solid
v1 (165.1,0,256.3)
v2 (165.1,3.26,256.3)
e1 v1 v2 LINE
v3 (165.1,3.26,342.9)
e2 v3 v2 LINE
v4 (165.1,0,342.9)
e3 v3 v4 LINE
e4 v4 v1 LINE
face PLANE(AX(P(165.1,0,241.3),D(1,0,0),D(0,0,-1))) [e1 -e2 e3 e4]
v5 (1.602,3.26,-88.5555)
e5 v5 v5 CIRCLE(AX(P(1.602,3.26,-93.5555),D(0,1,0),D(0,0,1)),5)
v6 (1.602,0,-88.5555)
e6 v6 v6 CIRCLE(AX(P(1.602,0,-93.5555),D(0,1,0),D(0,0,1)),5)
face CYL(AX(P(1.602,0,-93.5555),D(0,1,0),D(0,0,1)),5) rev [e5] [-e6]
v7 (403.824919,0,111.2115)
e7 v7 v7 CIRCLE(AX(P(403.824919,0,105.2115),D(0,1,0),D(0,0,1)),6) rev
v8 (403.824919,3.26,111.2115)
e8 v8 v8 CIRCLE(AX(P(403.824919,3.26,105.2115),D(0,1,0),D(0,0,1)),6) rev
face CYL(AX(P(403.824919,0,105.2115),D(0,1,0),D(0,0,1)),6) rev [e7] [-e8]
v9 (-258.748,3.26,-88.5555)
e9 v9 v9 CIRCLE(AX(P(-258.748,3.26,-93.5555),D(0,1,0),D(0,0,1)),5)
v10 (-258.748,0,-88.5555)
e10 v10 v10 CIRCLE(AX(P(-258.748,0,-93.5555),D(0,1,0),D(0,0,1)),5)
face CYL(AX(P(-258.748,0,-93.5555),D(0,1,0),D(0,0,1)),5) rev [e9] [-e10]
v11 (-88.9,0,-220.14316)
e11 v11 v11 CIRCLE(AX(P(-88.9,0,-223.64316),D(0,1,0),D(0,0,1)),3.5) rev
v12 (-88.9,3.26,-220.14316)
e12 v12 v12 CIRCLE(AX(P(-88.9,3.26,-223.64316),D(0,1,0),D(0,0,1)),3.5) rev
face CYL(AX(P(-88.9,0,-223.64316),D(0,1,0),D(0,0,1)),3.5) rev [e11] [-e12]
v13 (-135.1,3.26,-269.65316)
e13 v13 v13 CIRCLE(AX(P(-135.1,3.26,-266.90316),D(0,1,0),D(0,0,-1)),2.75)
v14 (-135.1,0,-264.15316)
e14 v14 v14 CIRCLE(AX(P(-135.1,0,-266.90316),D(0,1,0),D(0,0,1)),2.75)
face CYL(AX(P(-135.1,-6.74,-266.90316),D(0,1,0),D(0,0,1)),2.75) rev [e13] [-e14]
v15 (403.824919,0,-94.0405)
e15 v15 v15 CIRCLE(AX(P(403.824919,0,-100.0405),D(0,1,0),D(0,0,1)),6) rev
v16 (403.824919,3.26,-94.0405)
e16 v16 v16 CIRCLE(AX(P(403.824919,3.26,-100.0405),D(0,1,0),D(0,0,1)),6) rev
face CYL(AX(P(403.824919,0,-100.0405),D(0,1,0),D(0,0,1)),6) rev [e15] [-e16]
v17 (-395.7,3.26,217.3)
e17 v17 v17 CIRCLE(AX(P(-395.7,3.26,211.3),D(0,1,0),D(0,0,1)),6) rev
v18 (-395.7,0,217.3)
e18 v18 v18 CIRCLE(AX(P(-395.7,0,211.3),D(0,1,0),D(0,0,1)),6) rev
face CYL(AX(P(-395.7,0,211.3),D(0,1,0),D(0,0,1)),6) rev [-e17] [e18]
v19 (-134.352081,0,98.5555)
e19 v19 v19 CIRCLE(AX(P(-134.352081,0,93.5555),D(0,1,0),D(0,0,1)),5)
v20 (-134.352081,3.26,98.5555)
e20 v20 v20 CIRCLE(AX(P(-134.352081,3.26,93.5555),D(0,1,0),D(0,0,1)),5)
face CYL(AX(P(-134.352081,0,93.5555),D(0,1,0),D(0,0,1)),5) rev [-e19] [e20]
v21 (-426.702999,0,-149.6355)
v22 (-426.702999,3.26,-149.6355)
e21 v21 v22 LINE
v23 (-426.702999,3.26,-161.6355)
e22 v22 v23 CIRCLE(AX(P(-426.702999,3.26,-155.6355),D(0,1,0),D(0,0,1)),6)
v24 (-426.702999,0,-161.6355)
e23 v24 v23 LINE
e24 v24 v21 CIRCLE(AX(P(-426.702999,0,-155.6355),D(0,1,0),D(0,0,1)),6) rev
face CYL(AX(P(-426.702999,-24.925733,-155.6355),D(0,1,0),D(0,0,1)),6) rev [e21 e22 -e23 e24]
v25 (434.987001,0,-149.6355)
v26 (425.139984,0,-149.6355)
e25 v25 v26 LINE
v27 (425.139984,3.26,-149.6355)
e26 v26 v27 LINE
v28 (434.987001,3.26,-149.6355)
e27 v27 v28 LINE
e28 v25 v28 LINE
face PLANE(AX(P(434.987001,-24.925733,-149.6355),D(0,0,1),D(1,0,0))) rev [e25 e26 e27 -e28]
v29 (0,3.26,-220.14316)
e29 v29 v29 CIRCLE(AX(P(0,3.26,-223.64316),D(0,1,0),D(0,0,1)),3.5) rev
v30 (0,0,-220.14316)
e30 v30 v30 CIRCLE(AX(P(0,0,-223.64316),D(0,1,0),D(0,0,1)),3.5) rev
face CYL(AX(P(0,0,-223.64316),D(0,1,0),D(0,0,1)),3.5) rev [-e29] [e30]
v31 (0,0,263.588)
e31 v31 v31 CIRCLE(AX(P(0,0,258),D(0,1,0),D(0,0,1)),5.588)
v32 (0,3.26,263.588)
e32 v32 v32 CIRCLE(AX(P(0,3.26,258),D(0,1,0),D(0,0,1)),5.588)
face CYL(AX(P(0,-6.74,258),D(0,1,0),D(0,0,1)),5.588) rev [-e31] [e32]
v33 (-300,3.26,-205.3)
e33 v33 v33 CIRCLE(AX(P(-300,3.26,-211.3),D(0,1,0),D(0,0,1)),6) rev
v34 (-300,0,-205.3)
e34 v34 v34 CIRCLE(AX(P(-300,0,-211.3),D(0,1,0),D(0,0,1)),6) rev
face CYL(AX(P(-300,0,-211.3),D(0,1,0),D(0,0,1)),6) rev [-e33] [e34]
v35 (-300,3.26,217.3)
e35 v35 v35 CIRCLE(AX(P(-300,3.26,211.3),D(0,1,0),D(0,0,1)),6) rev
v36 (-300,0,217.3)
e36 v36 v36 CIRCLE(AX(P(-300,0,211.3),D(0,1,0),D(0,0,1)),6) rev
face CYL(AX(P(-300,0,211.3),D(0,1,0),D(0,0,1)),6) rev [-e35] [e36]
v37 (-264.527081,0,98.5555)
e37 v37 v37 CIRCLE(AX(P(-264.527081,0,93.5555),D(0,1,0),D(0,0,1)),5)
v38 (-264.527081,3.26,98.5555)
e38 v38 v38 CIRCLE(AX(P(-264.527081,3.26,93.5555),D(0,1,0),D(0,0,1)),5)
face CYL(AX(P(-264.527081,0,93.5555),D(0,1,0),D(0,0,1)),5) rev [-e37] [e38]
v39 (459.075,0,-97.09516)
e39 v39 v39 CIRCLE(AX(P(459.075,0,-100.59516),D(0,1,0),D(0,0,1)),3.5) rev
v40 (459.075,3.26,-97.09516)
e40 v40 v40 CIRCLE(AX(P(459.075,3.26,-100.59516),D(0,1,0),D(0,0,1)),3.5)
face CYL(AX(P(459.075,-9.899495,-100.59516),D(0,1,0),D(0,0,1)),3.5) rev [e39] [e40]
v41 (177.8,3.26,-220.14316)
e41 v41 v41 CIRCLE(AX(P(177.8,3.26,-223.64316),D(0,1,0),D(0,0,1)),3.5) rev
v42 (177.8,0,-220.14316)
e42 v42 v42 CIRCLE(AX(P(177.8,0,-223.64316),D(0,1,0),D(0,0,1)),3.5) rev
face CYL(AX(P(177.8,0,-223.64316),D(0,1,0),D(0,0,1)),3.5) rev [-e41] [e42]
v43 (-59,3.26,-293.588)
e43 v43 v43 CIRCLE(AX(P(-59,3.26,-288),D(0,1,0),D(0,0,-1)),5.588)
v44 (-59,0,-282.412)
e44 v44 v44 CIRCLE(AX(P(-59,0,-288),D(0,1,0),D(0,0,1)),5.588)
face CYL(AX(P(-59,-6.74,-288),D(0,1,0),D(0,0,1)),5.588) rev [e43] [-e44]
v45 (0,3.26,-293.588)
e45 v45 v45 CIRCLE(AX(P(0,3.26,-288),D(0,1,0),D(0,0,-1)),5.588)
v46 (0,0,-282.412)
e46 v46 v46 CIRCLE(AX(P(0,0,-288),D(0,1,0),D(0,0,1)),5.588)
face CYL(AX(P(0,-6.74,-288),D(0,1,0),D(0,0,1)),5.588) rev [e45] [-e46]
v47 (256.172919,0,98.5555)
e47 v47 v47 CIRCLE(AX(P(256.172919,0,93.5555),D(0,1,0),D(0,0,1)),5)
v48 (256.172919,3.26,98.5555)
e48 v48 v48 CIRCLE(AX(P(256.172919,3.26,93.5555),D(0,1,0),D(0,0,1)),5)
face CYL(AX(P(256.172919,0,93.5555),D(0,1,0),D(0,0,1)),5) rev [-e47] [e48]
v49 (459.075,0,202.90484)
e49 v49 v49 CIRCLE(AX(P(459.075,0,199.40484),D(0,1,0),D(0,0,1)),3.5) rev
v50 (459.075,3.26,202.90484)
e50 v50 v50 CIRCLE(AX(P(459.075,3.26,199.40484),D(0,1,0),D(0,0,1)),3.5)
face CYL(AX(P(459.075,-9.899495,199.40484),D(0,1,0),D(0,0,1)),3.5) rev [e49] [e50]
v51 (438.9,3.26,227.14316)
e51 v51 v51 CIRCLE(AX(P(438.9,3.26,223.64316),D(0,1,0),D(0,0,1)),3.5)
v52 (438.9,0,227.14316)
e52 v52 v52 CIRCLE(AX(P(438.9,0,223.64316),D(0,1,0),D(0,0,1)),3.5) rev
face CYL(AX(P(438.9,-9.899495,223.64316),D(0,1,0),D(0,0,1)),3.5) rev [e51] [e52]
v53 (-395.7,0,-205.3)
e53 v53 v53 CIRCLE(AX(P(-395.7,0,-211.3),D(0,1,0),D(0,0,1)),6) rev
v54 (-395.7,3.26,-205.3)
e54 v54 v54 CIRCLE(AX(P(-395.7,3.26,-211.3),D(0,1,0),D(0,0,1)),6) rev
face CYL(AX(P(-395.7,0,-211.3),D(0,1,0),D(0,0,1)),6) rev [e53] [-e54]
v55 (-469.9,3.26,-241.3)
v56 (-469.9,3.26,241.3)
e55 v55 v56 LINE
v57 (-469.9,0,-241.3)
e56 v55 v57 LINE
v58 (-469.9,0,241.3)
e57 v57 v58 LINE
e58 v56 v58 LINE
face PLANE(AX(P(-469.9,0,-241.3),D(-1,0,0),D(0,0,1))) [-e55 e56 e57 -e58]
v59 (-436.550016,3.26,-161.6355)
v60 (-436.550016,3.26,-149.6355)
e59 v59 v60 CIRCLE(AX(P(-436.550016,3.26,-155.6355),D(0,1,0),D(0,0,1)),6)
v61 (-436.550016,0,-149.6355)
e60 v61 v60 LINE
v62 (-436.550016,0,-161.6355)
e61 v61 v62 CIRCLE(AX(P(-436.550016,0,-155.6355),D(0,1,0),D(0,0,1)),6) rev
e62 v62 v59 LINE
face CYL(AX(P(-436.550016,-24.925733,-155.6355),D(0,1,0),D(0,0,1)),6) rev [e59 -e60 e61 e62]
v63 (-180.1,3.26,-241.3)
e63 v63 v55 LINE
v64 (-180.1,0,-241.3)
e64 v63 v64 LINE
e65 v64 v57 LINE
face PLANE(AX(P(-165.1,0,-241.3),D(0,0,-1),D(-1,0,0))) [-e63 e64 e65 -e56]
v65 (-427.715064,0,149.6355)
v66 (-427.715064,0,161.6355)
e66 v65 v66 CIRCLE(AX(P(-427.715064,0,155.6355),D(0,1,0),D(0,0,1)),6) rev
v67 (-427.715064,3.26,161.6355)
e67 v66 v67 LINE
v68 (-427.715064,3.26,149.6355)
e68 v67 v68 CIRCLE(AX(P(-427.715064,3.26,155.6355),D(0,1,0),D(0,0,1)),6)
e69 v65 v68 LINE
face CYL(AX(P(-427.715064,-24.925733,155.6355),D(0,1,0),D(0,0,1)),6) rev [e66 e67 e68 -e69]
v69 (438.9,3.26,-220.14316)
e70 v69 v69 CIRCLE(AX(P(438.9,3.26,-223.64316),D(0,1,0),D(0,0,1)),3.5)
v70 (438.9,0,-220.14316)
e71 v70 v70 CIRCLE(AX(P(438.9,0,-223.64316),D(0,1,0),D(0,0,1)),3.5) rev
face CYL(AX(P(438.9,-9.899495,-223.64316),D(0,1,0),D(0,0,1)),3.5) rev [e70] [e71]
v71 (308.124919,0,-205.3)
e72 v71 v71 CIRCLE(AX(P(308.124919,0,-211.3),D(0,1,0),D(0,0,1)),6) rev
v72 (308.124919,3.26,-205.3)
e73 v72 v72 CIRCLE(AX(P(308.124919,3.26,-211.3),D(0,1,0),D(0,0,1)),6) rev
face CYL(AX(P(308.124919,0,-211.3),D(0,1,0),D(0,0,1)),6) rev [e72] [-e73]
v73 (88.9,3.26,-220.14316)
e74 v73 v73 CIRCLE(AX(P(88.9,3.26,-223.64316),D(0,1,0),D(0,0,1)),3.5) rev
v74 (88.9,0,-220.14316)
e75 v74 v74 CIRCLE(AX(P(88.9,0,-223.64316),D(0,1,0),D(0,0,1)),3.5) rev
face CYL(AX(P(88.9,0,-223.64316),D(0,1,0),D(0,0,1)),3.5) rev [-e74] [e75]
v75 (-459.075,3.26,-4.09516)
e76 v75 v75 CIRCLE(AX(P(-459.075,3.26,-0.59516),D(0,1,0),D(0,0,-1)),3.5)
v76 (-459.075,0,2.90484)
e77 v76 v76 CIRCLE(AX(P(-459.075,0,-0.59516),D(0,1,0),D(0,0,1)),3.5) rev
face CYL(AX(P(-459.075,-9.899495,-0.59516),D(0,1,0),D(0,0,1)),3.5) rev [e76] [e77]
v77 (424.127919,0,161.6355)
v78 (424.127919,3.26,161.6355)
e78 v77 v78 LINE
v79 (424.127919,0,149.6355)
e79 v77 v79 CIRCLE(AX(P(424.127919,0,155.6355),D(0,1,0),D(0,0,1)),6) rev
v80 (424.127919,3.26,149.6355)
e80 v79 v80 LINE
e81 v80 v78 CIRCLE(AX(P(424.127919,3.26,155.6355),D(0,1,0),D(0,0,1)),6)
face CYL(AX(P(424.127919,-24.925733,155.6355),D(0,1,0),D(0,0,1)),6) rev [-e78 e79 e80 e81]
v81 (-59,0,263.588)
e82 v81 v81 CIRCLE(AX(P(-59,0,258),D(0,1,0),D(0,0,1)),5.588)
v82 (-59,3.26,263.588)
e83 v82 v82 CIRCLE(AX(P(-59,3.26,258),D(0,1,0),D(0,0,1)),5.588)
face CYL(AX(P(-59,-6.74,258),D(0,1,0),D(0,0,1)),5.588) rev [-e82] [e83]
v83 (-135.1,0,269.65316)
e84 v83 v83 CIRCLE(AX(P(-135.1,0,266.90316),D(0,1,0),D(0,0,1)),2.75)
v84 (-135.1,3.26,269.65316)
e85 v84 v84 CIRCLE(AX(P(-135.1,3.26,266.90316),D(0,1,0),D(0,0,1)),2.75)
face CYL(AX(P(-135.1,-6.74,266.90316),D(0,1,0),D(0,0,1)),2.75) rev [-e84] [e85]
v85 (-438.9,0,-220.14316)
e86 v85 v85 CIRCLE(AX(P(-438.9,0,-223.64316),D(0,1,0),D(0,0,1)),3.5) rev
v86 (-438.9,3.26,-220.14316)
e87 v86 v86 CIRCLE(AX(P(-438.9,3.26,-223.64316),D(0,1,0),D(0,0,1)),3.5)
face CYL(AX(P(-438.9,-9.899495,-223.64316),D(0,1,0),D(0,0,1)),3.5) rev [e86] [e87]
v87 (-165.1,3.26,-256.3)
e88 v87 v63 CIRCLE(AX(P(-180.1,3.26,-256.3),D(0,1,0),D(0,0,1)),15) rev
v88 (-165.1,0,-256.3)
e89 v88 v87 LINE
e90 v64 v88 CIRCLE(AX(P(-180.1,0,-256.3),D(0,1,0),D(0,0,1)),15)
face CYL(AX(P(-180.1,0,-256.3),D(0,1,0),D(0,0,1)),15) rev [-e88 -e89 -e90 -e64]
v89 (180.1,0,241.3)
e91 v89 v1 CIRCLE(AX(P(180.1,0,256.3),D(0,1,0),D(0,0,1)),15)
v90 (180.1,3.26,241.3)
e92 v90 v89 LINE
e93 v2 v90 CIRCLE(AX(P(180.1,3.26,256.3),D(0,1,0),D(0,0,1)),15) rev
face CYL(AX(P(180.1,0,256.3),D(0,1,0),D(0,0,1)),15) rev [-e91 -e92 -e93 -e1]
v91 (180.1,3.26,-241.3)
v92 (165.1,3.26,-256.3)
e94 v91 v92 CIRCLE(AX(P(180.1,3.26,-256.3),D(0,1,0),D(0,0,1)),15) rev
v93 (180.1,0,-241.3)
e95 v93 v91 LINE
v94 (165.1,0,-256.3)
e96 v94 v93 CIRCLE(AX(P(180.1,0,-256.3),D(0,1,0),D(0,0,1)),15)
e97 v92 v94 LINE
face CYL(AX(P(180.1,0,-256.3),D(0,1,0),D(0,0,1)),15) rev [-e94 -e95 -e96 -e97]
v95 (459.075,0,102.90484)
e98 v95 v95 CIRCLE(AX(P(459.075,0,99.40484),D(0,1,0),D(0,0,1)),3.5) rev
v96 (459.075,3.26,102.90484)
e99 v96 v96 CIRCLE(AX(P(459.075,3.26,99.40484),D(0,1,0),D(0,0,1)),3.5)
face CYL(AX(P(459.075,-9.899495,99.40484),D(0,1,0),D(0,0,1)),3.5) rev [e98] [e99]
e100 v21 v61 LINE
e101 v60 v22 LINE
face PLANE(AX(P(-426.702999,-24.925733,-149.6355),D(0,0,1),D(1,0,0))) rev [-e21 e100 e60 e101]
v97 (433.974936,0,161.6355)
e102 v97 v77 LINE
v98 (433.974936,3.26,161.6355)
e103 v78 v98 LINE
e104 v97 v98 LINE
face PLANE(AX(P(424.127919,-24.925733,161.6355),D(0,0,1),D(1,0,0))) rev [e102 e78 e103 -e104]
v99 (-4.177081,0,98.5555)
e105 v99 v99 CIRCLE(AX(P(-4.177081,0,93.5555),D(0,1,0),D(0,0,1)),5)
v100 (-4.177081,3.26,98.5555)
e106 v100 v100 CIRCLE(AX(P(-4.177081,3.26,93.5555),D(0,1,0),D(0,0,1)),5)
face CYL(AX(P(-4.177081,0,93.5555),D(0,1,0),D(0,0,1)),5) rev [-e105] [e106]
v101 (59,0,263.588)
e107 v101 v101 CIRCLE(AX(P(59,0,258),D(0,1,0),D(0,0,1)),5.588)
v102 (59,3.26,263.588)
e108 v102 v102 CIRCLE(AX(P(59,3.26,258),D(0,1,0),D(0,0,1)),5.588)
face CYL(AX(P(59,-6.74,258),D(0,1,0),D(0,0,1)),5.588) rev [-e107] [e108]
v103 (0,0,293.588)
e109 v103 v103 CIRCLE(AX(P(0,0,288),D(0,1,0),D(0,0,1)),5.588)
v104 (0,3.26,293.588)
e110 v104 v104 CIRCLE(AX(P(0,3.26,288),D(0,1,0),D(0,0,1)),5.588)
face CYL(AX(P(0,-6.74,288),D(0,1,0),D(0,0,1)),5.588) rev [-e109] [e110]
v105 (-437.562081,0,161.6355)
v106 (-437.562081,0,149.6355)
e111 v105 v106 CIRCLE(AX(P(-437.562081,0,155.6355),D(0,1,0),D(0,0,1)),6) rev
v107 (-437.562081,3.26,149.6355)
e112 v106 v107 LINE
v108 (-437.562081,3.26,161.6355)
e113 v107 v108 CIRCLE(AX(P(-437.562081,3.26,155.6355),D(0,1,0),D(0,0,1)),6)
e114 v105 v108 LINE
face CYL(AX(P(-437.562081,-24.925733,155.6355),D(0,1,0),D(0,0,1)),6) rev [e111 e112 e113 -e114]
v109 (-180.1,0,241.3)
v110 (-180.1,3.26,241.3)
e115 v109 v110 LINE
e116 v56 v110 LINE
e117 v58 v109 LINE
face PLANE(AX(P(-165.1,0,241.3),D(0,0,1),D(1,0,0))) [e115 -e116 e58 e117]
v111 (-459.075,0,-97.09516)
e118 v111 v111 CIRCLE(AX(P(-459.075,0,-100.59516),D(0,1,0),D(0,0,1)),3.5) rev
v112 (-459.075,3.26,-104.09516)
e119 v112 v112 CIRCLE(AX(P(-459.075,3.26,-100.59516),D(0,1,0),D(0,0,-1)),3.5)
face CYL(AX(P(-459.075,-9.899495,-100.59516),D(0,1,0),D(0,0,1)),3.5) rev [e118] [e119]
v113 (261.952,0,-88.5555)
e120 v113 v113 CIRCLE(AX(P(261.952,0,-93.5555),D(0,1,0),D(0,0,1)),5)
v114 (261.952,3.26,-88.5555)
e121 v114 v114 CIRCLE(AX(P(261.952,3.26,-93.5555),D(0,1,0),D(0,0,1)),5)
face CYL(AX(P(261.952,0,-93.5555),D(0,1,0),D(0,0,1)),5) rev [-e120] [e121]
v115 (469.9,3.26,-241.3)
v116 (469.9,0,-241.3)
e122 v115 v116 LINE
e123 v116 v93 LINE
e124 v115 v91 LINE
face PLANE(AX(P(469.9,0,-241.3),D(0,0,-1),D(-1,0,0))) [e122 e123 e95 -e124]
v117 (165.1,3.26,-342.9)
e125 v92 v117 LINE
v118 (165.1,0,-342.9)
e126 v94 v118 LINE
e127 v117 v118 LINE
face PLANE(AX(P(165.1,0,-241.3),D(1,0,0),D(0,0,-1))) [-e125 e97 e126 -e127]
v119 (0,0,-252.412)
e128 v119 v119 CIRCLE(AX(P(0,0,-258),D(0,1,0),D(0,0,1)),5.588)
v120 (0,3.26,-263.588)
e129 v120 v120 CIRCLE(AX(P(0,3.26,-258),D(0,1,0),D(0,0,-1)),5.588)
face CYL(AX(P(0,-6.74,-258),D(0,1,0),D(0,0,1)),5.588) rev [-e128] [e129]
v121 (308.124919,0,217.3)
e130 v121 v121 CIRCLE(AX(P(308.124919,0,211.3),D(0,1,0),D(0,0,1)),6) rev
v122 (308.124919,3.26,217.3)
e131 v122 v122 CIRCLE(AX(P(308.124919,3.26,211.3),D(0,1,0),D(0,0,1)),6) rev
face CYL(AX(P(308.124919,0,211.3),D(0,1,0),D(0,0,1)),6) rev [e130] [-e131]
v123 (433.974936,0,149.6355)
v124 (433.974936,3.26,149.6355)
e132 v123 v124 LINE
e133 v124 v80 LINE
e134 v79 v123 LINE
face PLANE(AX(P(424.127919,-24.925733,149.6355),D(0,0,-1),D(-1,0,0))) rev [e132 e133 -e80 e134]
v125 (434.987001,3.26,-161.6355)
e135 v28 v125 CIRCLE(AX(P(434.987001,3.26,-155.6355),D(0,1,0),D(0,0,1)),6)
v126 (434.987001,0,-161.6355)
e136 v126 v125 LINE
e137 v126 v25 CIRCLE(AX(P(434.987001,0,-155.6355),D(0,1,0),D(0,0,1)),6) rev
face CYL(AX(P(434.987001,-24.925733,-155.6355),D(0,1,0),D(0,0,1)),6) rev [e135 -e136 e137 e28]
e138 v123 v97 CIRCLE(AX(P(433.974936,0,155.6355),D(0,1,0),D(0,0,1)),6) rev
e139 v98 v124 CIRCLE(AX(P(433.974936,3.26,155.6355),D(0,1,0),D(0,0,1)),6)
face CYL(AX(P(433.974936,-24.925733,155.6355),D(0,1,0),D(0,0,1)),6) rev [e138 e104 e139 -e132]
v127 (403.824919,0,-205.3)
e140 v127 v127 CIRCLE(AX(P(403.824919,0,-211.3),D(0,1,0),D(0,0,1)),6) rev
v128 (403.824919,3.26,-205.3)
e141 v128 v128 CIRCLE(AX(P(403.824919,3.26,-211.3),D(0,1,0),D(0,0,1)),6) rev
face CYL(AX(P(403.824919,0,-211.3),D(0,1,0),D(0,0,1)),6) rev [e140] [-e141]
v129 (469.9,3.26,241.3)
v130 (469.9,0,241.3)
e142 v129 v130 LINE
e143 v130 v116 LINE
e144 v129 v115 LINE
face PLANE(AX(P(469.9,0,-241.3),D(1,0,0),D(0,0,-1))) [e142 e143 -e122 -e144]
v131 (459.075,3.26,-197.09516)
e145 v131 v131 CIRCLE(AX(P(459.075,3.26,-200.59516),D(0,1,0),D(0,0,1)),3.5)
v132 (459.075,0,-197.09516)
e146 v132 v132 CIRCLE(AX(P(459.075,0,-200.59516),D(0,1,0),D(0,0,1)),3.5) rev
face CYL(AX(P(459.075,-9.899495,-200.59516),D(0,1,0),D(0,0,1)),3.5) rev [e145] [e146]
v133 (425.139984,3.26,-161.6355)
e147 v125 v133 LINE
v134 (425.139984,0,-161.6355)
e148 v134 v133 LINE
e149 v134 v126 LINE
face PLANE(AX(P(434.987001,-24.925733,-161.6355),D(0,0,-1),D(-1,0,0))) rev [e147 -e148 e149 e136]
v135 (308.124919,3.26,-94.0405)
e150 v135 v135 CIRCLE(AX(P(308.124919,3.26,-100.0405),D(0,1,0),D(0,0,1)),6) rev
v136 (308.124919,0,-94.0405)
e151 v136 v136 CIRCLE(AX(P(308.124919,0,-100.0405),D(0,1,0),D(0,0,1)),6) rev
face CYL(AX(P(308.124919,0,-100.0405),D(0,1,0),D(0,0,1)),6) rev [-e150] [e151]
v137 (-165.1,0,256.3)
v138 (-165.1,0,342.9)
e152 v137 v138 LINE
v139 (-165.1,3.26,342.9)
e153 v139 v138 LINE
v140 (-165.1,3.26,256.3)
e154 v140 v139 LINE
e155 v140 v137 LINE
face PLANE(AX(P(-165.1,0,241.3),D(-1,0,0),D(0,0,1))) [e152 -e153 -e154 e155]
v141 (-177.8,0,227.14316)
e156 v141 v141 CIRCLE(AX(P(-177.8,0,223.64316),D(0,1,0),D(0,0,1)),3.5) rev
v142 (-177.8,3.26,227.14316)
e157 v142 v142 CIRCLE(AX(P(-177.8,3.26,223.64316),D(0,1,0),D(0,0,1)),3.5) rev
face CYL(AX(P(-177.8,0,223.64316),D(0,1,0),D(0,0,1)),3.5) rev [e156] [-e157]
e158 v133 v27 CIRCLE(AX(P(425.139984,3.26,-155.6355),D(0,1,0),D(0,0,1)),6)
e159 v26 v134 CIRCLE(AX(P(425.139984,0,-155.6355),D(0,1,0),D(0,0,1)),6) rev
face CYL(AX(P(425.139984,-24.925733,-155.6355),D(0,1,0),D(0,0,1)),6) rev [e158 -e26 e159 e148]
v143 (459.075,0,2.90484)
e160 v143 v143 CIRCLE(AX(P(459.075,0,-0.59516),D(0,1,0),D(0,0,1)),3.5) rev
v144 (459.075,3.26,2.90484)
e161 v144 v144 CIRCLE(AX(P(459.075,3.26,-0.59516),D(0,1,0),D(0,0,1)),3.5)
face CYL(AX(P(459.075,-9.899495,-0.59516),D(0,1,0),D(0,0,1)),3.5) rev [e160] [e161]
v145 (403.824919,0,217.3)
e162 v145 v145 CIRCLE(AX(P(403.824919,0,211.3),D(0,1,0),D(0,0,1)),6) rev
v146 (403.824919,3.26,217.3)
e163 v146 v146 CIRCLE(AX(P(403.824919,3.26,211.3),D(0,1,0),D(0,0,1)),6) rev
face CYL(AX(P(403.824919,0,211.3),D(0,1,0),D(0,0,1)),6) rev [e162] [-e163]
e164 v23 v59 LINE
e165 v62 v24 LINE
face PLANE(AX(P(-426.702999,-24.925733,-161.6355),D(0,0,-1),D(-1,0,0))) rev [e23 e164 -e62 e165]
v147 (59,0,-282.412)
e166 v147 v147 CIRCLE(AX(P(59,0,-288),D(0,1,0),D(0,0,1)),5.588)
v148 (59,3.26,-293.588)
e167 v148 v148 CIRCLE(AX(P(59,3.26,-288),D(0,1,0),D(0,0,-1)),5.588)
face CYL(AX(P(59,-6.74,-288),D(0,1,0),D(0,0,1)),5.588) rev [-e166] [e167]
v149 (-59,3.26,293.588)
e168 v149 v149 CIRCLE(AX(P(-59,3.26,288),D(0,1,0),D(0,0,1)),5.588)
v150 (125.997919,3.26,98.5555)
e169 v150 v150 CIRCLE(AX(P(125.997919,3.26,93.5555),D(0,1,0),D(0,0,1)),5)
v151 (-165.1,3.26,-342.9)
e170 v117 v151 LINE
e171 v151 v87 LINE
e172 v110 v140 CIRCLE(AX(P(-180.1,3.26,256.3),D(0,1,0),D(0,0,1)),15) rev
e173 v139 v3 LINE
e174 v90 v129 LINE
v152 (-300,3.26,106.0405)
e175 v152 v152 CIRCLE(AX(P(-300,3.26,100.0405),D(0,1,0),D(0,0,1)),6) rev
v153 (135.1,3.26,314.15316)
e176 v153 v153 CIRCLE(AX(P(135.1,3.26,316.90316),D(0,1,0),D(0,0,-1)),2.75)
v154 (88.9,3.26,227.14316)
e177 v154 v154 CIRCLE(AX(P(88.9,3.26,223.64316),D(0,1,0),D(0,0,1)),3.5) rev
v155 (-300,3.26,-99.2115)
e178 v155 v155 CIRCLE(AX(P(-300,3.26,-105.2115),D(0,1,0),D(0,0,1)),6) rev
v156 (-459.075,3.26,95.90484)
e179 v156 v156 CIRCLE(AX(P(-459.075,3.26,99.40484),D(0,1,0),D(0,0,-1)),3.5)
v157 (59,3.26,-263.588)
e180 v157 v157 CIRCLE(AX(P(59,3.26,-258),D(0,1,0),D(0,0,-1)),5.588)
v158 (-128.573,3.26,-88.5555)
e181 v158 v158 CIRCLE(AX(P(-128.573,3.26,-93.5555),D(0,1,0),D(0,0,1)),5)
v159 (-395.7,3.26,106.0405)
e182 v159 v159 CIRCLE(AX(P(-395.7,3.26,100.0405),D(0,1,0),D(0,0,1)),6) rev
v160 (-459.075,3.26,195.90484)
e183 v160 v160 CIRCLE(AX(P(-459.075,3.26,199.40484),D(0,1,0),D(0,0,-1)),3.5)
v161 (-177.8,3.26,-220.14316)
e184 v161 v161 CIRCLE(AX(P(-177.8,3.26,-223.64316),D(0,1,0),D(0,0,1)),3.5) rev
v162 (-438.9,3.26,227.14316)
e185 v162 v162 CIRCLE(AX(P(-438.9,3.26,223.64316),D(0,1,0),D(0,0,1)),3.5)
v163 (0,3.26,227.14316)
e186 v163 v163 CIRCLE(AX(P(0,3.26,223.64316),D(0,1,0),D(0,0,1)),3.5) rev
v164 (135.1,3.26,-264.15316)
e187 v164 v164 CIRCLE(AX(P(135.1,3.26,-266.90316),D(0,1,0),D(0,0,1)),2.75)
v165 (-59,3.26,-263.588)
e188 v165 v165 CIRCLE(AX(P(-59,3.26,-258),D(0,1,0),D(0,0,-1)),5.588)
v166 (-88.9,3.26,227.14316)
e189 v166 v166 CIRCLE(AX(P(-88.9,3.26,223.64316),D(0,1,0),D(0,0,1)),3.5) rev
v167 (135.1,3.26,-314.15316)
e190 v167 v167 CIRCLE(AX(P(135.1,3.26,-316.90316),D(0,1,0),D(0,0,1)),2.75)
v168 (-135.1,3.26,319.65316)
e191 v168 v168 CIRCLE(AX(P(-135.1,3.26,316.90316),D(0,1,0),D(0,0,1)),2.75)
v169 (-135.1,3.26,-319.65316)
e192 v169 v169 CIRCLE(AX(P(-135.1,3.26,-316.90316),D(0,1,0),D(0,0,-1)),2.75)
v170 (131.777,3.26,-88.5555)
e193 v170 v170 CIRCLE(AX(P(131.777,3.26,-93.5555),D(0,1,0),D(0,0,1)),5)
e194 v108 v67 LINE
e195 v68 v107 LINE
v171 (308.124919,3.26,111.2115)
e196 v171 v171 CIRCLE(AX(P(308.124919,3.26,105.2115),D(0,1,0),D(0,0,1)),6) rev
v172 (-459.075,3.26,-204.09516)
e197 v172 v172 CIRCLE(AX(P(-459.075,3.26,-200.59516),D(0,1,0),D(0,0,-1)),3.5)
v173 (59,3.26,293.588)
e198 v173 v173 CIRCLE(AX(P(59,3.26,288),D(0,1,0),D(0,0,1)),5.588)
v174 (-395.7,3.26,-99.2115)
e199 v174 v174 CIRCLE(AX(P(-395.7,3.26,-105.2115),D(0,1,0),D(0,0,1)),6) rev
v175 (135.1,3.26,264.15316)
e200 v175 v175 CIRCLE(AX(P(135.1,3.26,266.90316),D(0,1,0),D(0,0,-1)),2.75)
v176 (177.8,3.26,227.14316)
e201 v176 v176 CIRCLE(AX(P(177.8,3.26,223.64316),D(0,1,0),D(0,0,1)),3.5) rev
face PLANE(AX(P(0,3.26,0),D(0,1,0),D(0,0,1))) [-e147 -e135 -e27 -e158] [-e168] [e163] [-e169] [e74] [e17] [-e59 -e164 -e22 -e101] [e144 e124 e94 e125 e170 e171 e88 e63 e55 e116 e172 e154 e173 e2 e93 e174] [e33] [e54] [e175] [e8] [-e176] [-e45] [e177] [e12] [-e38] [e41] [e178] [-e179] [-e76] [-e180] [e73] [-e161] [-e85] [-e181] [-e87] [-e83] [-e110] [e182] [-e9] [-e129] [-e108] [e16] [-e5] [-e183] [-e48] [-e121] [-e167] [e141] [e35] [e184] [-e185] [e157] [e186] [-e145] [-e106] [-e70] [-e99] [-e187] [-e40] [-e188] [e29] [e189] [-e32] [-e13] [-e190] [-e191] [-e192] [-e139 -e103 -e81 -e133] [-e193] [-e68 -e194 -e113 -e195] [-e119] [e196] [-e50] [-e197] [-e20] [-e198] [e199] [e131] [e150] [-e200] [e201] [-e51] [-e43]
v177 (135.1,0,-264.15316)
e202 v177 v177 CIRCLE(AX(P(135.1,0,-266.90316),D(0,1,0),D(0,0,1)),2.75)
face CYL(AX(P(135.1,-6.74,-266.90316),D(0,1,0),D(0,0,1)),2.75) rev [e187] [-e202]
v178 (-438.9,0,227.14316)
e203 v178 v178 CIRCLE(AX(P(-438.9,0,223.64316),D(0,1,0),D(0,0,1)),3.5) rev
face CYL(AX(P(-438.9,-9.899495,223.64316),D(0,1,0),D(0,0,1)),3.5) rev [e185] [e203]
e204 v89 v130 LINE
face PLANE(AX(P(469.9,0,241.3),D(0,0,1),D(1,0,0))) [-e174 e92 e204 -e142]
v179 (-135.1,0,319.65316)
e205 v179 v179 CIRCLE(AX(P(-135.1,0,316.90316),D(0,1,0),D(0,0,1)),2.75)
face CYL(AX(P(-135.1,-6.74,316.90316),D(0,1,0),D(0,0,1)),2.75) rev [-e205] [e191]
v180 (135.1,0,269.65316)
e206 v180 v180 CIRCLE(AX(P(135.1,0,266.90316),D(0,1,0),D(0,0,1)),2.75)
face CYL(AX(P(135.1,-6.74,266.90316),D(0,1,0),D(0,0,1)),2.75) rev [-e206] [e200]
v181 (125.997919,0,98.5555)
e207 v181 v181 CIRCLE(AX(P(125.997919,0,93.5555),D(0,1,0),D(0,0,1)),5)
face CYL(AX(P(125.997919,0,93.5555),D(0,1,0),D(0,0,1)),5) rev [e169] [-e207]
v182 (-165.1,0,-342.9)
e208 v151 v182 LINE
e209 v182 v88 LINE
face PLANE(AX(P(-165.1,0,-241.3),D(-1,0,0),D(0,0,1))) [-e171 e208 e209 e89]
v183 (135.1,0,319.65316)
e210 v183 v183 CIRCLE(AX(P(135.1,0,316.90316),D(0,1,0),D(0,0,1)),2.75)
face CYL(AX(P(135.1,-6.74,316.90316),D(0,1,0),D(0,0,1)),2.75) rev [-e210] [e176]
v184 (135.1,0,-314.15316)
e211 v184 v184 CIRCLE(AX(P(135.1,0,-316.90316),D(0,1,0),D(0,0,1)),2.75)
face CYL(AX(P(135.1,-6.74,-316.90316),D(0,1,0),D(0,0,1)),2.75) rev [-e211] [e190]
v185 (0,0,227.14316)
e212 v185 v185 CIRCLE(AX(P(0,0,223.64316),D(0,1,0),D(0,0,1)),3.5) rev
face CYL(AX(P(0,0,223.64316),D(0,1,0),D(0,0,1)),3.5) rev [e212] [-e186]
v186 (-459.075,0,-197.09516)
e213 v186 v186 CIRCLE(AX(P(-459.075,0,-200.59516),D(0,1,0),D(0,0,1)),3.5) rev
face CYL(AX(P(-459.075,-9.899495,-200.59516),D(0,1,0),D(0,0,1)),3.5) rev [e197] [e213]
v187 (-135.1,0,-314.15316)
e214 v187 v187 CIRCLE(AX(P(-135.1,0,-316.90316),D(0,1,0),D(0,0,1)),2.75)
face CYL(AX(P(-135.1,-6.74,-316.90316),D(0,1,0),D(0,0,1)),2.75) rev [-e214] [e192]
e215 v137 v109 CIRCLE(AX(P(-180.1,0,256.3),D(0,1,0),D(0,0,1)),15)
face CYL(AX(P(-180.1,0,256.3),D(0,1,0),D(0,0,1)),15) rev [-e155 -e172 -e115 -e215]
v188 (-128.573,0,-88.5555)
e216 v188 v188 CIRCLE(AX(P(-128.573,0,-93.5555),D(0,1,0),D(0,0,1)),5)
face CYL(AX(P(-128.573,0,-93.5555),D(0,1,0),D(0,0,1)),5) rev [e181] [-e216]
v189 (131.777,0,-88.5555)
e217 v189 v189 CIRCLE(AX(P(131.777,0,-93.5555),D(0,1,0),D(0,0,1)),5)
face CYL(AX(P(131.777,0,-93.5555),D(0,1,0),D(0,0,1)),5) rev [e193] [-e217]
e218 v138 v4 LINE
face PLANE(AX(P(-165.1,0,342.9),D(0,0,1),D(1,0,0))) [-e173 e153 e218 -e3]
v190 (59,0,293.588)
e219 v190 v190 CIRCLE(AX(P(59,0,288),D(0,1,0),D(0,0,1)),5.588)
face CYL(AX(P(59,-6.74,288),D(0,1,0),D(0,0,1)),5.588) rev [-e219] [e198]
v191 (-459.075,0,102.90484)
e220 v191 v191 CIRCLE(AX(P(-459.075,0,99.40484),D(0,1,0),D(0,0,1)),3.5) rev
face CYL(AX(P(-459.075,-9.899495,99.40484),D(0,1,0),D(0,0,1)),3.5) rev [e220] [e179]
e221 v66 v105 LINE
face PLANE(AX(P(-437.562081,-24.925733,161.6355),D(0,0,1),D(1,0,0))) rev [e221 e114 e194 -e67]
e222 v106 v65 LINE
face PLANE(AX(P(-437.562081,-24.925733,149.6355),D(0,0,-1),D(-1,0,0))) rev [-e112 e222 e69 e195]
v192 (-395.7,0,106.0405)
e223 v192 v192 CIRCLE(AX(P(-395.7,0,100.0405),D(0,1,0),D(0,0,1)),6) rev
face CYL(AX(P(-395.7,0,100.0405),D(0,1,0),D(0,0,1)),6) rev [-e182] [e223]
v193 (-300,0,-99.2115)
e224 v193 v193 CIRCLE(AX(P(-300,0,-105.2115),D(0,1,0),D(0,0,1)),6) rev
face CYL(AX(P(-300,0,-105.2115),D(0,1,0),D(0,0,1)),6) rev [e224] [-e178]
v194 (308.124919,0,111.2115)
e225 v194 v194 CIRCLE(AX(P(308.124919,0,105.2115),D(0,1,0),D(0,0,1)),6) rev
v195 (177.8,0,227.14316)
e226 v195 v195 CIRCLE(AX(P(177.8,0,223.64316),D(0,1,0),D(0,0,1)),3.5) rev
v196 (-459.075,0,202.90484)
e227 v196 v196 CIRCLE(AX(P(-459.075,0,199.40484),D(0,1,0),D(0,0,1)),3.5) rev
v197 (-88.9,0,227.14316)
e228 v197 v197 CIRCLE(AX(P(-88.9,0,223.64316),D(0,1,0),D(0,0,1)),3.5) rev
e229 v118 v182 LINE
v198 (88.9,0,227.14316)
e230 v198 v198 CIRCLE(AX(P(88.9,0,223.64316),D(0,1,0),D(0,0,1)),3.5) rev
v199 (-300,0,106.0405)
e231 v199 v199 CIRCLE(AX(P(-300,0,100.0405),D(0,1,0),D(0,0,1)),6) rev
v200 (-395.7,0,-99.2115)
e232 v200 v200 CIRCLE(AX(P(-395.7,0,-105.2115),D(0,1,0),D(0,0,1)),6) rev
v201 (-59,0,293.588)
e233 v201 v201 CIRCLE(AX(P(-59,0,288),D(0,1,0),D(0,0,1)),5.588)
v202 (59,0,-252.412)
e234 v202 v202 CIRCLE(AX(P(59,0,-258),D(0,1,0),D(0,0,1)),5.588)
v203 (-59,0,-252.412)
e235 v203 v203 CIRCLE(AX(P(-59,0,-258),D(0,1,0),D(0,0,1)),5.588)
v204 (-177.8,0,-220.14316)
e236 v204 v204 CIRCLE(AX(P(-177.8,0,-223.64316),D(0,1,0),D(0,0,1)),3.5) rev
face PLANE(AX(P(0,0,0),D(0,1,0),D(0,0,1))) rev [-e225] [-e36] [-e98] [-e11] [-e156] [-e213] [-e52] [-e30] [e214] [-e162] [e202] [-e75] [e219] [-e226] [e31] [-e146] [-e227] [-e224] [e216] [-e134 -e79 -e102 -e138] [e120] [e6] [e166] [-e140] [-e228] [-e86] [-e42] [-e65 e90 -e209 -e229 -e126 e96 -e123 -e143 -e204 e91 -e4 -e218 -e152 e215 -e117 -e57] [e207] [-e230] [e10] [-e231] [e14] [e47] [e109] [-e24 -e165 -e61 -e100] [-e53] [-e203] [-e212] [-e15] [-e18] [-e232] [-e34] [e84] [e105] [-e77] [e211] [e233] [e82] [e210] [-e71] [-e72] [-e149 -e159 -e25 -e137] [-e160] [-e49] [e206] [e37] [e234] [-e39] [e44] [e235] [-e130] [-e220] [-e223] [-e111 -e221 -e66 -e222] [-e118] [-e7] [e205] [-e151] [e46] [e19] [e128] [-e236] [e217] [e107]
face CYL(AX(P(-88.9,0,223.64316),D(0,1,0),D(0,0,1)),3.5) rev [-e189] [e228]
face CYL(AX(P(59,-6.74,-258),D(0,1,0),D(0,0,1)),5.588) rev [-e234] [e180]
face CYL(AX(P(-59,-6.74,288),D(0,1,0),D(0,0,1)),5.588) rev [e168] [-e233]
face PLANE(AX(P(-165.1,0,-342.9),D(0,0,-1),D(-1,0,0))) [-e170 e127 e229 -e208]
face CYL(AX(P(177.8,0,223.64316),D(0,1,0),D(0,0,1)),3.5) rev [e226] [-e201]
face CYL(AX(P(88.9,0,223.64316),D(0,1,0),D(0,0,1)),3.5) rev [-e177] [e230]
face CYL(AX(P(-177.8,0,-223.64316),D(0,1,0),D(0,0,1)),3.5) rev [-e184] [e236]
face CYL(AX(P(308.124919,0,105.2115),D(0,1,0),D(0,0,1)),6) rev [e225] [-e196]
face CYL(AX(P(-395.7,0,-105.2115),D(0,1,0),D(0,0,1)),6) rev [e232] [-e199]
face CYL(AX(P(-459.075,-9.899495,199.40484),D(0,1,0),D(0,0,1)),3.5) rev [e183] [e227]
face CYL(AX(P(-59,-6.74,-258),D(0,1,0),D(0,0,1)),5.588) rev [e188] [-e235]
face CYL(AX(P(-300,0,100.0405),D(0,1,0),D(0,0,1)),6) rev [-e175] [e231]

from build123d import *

# Parameters (mm, degrees)
BOSS_EXTRUDE2_DEPTH   = 3.26
SKETCH4_R             = 5
CUT_EXTRUDE7_DEPTH    = 10
SKETCH5_R             = 6
BEARING_HOLES_DEPTH   = 3.26
SKETCH7_R             = 3.5
CUT_EXTRUDE3_DEPTH    = 3.26
FRONT_HOLES_R         = 3.5
FRONT_HOLES_FET_DEPTH = 3.26
SKETCH10_R            = 3.500000002
SKETCH10_R_2          = 3.5
CUT_EXTRUDE5_DEPTH    = 3.26
CUT_EXTRUDE6_DEPTH    = 3.26
FILLET1_R             = 15
SKETCH13_R            = 5.588
CUT_EXTRUDE8_DEPTH    = 10
SKETCH14_R            = 2.75
CUT_EXTRUDE9_DEPTH    = 10


with BuildPart() as part:
    # Sketch1 → Boss-Extrude2 (new body)
    with BuildSketch(Plane(origin=(0, 0, 0), x_dir=(1, 0, 0), z_dir=(0, 1, 0))):
        Polygon((-165.1, 241.3), (-469.9, 241.3), (-469.9, -241.3), (-165.1, -241.3), (-165.1, -342.9), (165.1, -342.9), (165.1, -241.3), (469.9, -241.3), (469.9, 241.3), (165.1, 241.3), (165.1, 342.9), (-165.1, 342.9), align=None)
    extrude(amount=BOSS_EXTRUDE2_DEPTH)

    # Sketch4 → Cut-Extrude7 (cut)
    with BuildSketch(Plane(origin=(0, 3.26, 0), x_dir=(1, 0, 0), z_dir=(0, 1, 0))):
        with Locations(Location((-258.748000001, 93.5555, 0), (0, 0, 270))):
            Circle(SKETCH4_R)
        with Locations(Location((-128.573000001, 93.5555, 0), (0, 0, 270))):
            Circle(SKETCH4_R)
        with Locations(Location((1.601999999, 93.5555, 0), (0, 0, 270))):
            Circle(SKETCH4_R)
        with Locations(Location((131.776999999, 93.5555, 0), (0, 0, 270))):
            Circle(SKETCH4_R)
        with Locations(Location((261.951999999, 93.5555, 0), (0, 0, 270))):
            Circle(SKETCH4_R)
        with Locations(Location((256.172918992, -93.5555, 0), (0, 0, 270))):
            Circle(SKETCH4_R)
        with Locations(Location((125.997918992, -93.5555, 0), (0, 0, 270))):
            Circle(SKETCH4_R)
        with Locations(Location((-4.177081008, -93.5555, 0), (0, 0, 270))):
            Circle(SKETCH4_R)
        with Locations(Location((-134.352081008, -93.5555, 0), (0, 0, 270))):
            Circle(SKETCH4_R)
        with Locations(Location((-264.527081008, -93.5555, 0), (0, 0, 270))):
            Circle(SKETCH4_R)
    extrude(amount=-CUT_EXTRUDE7_DEPTH, mode=Mode.SUBTRACT)

    # Sketch5 → bearing holes (cut)
    with BuildSketch(Plane(origin=(0, 3.26, 0), x_dir=(1, 0, 0), z_dir=(0, 1, 0))):
        with Locations(Location((308.124918992, 211.3, 0), (0, 0, 270))):
            Circle(SKETCH5_R)
        with Locations(Location((403.824918992, 211.3, 0), (0, 0, 270))):
            Circle(SKETCH5_R)
        with Locations(Location((308.124918992, 100.0405, 0), (0, 0, 270))):
            Circle(SKETCH5_R)
        with Locations(Location((403.824918992, 100.0405, 0), (0, 0, 270))):
            Circle(SKETCH5_R)
        with Locations(Location((-395.7, -211.3, 0), (0, 0, 270))):
            Circle(SKETCH5_R)
        with Locations(Location((-300, -100.0405, 0), (0, 0, 270))):
            Circle(SKETCH5_R)
        with Locations(Location((-395.7, -100.0405, 0), (0, 0, 270))):
            Circle(SKETCH5_R)
        with Locations(Location((-300, -211.3, 0), (0, 0, 270))):
            Circle(SKETCH5_R)
        with Locations(Location((403.824918992, -105.2115, 0), (0, 0, 270))):
            Circle(SKETCH5_R)
        with Locations(Location((308.124918992, -105.2115, 0), (0, 0, 270))):
            Circle(SKETCH5_R)
        with Locations(Location((308.124918992, -211.3, 0), (0, 0, 270))):
            Circle(SKETCH5_R)
        with Locations(Location((403.824918992, -211.3, 0), (0, 0, 270))):
            Circle(SKETCH5_R)
        with Locations(Location((-300, 211.3, 0), (0, 0, 270))):
            Circle(SKETCH5_R)
        with Locations(Location((-395.7, 105.2115, 0), (0, 0, 270))):
            Circle(SKETCH5_R)
        with Locations(Location((-300, 105.2115, 0), (0, 0, 270))):
            Circle(SKETCH5_R)
        with Locations(Location((-395.7, 211.3, 0), (0, 0, 270))):
            Circle(SKETCH5_R)
    extrude(amount=-BEARING_HOLES_DEPTH, mode=Mode.SUBTRACT)

    # Sketch7 → Cut-Extrude3 (cut)
    with BuildSketch(Plane(origin=(0, 3.26, 0), x_dir=(1, 0, 0), z_dir=(0, 1, 0))):
        with Locations(Location((0, -223.64316, 0), (0, 0, 270))):
            Circle(SKETCH7_R)
        with Locations(Location((0, 223.64316, 0), (0, 0, 270))):
            Circle(SKETCH7_R)
        with Locations(Location((-88.9, -223.64316, 0), (0, 0, 270))):
            Circle(SKETCH7_R)
        with Locations(Location((-177.8, -223.64316, 0), (0, 0, 270))):
            Circle(SKETCH7_R)
        with Locations(Location((88.9, -223.64316, 0), (0, 0, 270))):
            Circle(SKETCH7_R)
        with Locations(Location((177.8, -223.64316, 0), (0, 0, 270))):
            Circle(SKETCH7_R)
        with Locations(Location((88.9, 223.64316, 0), (0, 0, 270))):
            Circle(SKETCH7_R)
        with Locations(Location((177.8, 223.64316, 0), (0, 0, 270))):
            Circle(SKETCH7_R)
        with Locations(Location((-88.9, 223.64316, 0), (0, 0, 270))):
            Circle(SKETCH7_R)
        with Locations(Location((-177.8, 223.64316, 0), (0, 0, 270))):
            Circle(SKETCH7_R)
    extrude(amount=-CUT_EXTRUDE3_DEPTH, mode=Mode.SUBTRACT)

    # front holes → front holes fet (cut)
    with BuildSketch(Plane(origin=(0, 3.26, 0), x_dir=(1, 0, 0), z_dir=(0, 1, 0))):
        with Locations(Location((459.075, 0.59516, 0), (0, 0, 270))):
            Circle(FRONT_HOLES_R)
        with Locations(Location((459.075, -99.40484, 0), (0, 0, 270))):
            Circle(FRONT_HOLES_R)
        with Locations(Location((459.075, -199.40484, 0), (0, 0, 270))):
            Circle(FRONT_HOLES_R)
        with Locations(Location((459.075, 100.59516, 0), (0, 0, 270))):
            Circle(FRONT_HOLES_R)
        with Locations(Location((459.075, 200.59516, 0), (0, 0, 270))):
            Circle(FRONT_HOLES_R)
        with Locations(Location((-459.075, 200.59516, 0), (0, 0, 270))):
            Circle(FRONT_HOLES_R)
        with Locations(Location((-459.075, 100.59516, 0), (0, 0, 270))):
            Circle(FRONT_HOLES_R)
        with Locations(Location((-459.075, -199.40484, 0), (0, 0, 270))):
            Circle(FRONT_HOLES_R)
        with Locations(Location((-459.075, -99.40484, 0), (0, 0, 270))):
            Circle(FRONT_HOLES_R)
        with Locations(Location((-459.075, 0.59516, 0), (0, 0, 270))):
            Circle(FRONT_HOLES_R)
    extrude(amount=-FRONT_HOLES_FET_DEPTH, mode=Mode.SUBTRACT)

    # Sketch10 → Cut-Extrude5 (cut)
    with BuildSketch(Plane(origin=(0, 3.26, 0), x_dir=(1, 0, 0), z_dir=(0, 1, 0))):
        with Locations(Location((-438.9, -223.64316, 0), (0, 0, 270))):
            Circle(SKETCH10_R)
        with Locations(Location((-438.9, 223.64316, 0), (0, 0, 270))):
            Circle(SKETCH10_R)
        with Locations(Location((438.9, 223.64316, 0), (0, 0, 270))):
            Circle(SKETCH10_R_2)
        with Locations(Location((438.9, -223.64316, 0), (0, 0, 270))):
            Circle(SKETCH10_R_2)
    extrude(amount=-CUT_EXTRUDE5_DEPTH, mode=Mode.SUBTRACT)

    # Sketch12 → Cut-Extrude6 (cut)
    with BuildSketch(Plane(origin=(0, 3.26, 0), x_dir=(1, 0, 0), z_dir=(0, 1, 0))):
        with BuildLine():
            Line((-426.702999083, 149.6355), (-436.550016189, 149.6355))
            ThreePointArc((-436.550016189, 149.6355), (-442.550016189, 155.6355), (-436.550016189, 161.6355))
            Line((-436.550016189, 161.6355), (-426.702999083, 161.6355))
            ThreePointArc((-426.702999083, 161.6355), (-420.702999083, 155.6355), (-426.702999083, 149.6355))
        make_face()
        with BuildLine():
            Line((-437.562081008, -149.6355), (-427.715063902, -149.6355))
            ThreePointArc((-427.715063902, -149.6355), (-421.715063902, -155.6355), (-427.715063902, -161.6355))
            Line((-427.715063902, -161.6355), (-437.562081008, -161.6355))
            ThreePointArc((-437.562081008, -161.6355), (-443.562081008, -155.6355), (-437.562081008, -149.6355))
        make_face()
        with BuildLine():
            Line((424.127918992, -149.6355), (433.974936098, -149.6355))
            ThreePointArc((433.974936098, -149.6355), (439.974936098, -155.6355), (433.974936098, -161.6355))
            Line((433.974936098, -161.6355), (424.127918992, -161.6355))
            ThreePointArc((424.127918992, -161.6355), (418.127918992, -155.6355), (424.127918992, -149.6355))
        make_face()
        with BuildLine():
            Line((434.987000917, 149.6355), (425.139983811, 149.6355))
            ThreePointArc((425.139983811, 149.6355), (419.139983811, 155.6355), (425.139983811, 161.6355))
            Line((425.139983811, 161.6355), (434.987000917, 161.6355))
            ThreePointArc((434.987000917, 161.6355), (440.987000917, 155.6355), (434.987000917, 149.6355))
        make_face()
    extrude(amount=-CUT_EXTRUDE6_DEPTH, mode=Mode.SUBTRACT)

    # Fillet1
    fillet1_edges = [part.edges().sort_by_distance(p)[0] for p in [
        (-165.1, 1.63, 241.3),
        (165.1, 1.63, 241.3),
        (165.1, 1.63, -241.3),
        (-165.1, 1.63, -241.3),
    ]]
    fillet(fillet1_edges, radius=FILLET1_R)

    # Sketch13 → Cut-Extrude8 (cut)
    with BuildSketch(Plane(origin=(0, 3.26, 0), x_dir=(1, 0, 0), z_dir=(0, 1, 0))):
        with Locations(Location((59, -258, 0), (0, 0, 270))):
            Circle(SKETCH13_R)
        with Locations(Location((0, -258, 0), (0, 0, 270))):
            Circle(SKETCH13_R)
        with Locations(Location((-59, -258, 0), (0, 0, 270))):
            Circle(SKETCH13_R)
        with Locations(Location((59, -288, 0), (0, 0, 270))):
            Circle(SKETCH13_R)
        with Locations(Location((0, -288, 0), (0, 0, 270))):
            Circle(SKETCH13_R)
        with Locations(Location((-59, -288, 0), (0, 0, 270))):
            Circle(SKETCH13_R)
        with Locations(Location((-59, 288, 0), (0, 0, 270))):
            Circle(SKETCH13_R)
        with Locations(Location((0, 288, 0), (0, 0, 270))):
            Circle(SKETCH13_R)
        with Locations(Location((59, 288, 0), (0, 0, 270))):
            Circle(SKETCH13_R)
        with Locations(Location((-59, 258, 0), (0, 0, 270))):
            Circle(SKETCH13_R)
        with Locations(Location((0, 258, 0), (0, 0, 270))):
            Circle(SKETCH13_R)
        with Locations(Location((59, 258, 0), (0, 0, 270))):
            Circle(SKETCH13_R)
    extrude(amount=-CUT_EXTRUDE8_DEPTH, mode=Mode.SUBTRACT)

    # Sketch14 → Cut-Extrude9 (cut)
    with BuildSketch(Plane(origin=(0, 3.26, 0), x_dir=(1, 0, 0), z_dir=(0, 1, 0))):
        with Locations(Location((135.1, 316.90316, 0), (0, 0, 270))):
            Circle(SKETCH14_R)
        with Locations(Location((135.1, 266.90316, 0), (0, 0, 270))):
            Circle(SKETCH14_R)
        with Locations(Location((-135.1, 266.90316, 0), (0, 0, 270))):
            Circle(SKETCH14_R)
        with Locations(Location((-135.1, 316.90316, 0), (0, 0, 270))):
            Circle(SKETCH14_R)
        with Locations(Location((135.1, -266.90316, 0), (0, 0, 270))):
            Circle(SKETCH14_R)
        with Locations(Location((135.1, -316.90316, 0), (0, 0, 270))):
            Circle(SKETCH14_R)
        with Locations(Location((-135.1, -316.90316, 0), (0, 0, 270))):
            Circle(SKETCH14_R)
        with Locations(Location((-135.1, -266.90316, 0), (0, 0, 270))):
            Circle(SKETCH14_R)
    extrude(amount=-CUT_EXTRUDE9_DEPTH, mode=Mode.SUBTRACT)


solid = part.part
